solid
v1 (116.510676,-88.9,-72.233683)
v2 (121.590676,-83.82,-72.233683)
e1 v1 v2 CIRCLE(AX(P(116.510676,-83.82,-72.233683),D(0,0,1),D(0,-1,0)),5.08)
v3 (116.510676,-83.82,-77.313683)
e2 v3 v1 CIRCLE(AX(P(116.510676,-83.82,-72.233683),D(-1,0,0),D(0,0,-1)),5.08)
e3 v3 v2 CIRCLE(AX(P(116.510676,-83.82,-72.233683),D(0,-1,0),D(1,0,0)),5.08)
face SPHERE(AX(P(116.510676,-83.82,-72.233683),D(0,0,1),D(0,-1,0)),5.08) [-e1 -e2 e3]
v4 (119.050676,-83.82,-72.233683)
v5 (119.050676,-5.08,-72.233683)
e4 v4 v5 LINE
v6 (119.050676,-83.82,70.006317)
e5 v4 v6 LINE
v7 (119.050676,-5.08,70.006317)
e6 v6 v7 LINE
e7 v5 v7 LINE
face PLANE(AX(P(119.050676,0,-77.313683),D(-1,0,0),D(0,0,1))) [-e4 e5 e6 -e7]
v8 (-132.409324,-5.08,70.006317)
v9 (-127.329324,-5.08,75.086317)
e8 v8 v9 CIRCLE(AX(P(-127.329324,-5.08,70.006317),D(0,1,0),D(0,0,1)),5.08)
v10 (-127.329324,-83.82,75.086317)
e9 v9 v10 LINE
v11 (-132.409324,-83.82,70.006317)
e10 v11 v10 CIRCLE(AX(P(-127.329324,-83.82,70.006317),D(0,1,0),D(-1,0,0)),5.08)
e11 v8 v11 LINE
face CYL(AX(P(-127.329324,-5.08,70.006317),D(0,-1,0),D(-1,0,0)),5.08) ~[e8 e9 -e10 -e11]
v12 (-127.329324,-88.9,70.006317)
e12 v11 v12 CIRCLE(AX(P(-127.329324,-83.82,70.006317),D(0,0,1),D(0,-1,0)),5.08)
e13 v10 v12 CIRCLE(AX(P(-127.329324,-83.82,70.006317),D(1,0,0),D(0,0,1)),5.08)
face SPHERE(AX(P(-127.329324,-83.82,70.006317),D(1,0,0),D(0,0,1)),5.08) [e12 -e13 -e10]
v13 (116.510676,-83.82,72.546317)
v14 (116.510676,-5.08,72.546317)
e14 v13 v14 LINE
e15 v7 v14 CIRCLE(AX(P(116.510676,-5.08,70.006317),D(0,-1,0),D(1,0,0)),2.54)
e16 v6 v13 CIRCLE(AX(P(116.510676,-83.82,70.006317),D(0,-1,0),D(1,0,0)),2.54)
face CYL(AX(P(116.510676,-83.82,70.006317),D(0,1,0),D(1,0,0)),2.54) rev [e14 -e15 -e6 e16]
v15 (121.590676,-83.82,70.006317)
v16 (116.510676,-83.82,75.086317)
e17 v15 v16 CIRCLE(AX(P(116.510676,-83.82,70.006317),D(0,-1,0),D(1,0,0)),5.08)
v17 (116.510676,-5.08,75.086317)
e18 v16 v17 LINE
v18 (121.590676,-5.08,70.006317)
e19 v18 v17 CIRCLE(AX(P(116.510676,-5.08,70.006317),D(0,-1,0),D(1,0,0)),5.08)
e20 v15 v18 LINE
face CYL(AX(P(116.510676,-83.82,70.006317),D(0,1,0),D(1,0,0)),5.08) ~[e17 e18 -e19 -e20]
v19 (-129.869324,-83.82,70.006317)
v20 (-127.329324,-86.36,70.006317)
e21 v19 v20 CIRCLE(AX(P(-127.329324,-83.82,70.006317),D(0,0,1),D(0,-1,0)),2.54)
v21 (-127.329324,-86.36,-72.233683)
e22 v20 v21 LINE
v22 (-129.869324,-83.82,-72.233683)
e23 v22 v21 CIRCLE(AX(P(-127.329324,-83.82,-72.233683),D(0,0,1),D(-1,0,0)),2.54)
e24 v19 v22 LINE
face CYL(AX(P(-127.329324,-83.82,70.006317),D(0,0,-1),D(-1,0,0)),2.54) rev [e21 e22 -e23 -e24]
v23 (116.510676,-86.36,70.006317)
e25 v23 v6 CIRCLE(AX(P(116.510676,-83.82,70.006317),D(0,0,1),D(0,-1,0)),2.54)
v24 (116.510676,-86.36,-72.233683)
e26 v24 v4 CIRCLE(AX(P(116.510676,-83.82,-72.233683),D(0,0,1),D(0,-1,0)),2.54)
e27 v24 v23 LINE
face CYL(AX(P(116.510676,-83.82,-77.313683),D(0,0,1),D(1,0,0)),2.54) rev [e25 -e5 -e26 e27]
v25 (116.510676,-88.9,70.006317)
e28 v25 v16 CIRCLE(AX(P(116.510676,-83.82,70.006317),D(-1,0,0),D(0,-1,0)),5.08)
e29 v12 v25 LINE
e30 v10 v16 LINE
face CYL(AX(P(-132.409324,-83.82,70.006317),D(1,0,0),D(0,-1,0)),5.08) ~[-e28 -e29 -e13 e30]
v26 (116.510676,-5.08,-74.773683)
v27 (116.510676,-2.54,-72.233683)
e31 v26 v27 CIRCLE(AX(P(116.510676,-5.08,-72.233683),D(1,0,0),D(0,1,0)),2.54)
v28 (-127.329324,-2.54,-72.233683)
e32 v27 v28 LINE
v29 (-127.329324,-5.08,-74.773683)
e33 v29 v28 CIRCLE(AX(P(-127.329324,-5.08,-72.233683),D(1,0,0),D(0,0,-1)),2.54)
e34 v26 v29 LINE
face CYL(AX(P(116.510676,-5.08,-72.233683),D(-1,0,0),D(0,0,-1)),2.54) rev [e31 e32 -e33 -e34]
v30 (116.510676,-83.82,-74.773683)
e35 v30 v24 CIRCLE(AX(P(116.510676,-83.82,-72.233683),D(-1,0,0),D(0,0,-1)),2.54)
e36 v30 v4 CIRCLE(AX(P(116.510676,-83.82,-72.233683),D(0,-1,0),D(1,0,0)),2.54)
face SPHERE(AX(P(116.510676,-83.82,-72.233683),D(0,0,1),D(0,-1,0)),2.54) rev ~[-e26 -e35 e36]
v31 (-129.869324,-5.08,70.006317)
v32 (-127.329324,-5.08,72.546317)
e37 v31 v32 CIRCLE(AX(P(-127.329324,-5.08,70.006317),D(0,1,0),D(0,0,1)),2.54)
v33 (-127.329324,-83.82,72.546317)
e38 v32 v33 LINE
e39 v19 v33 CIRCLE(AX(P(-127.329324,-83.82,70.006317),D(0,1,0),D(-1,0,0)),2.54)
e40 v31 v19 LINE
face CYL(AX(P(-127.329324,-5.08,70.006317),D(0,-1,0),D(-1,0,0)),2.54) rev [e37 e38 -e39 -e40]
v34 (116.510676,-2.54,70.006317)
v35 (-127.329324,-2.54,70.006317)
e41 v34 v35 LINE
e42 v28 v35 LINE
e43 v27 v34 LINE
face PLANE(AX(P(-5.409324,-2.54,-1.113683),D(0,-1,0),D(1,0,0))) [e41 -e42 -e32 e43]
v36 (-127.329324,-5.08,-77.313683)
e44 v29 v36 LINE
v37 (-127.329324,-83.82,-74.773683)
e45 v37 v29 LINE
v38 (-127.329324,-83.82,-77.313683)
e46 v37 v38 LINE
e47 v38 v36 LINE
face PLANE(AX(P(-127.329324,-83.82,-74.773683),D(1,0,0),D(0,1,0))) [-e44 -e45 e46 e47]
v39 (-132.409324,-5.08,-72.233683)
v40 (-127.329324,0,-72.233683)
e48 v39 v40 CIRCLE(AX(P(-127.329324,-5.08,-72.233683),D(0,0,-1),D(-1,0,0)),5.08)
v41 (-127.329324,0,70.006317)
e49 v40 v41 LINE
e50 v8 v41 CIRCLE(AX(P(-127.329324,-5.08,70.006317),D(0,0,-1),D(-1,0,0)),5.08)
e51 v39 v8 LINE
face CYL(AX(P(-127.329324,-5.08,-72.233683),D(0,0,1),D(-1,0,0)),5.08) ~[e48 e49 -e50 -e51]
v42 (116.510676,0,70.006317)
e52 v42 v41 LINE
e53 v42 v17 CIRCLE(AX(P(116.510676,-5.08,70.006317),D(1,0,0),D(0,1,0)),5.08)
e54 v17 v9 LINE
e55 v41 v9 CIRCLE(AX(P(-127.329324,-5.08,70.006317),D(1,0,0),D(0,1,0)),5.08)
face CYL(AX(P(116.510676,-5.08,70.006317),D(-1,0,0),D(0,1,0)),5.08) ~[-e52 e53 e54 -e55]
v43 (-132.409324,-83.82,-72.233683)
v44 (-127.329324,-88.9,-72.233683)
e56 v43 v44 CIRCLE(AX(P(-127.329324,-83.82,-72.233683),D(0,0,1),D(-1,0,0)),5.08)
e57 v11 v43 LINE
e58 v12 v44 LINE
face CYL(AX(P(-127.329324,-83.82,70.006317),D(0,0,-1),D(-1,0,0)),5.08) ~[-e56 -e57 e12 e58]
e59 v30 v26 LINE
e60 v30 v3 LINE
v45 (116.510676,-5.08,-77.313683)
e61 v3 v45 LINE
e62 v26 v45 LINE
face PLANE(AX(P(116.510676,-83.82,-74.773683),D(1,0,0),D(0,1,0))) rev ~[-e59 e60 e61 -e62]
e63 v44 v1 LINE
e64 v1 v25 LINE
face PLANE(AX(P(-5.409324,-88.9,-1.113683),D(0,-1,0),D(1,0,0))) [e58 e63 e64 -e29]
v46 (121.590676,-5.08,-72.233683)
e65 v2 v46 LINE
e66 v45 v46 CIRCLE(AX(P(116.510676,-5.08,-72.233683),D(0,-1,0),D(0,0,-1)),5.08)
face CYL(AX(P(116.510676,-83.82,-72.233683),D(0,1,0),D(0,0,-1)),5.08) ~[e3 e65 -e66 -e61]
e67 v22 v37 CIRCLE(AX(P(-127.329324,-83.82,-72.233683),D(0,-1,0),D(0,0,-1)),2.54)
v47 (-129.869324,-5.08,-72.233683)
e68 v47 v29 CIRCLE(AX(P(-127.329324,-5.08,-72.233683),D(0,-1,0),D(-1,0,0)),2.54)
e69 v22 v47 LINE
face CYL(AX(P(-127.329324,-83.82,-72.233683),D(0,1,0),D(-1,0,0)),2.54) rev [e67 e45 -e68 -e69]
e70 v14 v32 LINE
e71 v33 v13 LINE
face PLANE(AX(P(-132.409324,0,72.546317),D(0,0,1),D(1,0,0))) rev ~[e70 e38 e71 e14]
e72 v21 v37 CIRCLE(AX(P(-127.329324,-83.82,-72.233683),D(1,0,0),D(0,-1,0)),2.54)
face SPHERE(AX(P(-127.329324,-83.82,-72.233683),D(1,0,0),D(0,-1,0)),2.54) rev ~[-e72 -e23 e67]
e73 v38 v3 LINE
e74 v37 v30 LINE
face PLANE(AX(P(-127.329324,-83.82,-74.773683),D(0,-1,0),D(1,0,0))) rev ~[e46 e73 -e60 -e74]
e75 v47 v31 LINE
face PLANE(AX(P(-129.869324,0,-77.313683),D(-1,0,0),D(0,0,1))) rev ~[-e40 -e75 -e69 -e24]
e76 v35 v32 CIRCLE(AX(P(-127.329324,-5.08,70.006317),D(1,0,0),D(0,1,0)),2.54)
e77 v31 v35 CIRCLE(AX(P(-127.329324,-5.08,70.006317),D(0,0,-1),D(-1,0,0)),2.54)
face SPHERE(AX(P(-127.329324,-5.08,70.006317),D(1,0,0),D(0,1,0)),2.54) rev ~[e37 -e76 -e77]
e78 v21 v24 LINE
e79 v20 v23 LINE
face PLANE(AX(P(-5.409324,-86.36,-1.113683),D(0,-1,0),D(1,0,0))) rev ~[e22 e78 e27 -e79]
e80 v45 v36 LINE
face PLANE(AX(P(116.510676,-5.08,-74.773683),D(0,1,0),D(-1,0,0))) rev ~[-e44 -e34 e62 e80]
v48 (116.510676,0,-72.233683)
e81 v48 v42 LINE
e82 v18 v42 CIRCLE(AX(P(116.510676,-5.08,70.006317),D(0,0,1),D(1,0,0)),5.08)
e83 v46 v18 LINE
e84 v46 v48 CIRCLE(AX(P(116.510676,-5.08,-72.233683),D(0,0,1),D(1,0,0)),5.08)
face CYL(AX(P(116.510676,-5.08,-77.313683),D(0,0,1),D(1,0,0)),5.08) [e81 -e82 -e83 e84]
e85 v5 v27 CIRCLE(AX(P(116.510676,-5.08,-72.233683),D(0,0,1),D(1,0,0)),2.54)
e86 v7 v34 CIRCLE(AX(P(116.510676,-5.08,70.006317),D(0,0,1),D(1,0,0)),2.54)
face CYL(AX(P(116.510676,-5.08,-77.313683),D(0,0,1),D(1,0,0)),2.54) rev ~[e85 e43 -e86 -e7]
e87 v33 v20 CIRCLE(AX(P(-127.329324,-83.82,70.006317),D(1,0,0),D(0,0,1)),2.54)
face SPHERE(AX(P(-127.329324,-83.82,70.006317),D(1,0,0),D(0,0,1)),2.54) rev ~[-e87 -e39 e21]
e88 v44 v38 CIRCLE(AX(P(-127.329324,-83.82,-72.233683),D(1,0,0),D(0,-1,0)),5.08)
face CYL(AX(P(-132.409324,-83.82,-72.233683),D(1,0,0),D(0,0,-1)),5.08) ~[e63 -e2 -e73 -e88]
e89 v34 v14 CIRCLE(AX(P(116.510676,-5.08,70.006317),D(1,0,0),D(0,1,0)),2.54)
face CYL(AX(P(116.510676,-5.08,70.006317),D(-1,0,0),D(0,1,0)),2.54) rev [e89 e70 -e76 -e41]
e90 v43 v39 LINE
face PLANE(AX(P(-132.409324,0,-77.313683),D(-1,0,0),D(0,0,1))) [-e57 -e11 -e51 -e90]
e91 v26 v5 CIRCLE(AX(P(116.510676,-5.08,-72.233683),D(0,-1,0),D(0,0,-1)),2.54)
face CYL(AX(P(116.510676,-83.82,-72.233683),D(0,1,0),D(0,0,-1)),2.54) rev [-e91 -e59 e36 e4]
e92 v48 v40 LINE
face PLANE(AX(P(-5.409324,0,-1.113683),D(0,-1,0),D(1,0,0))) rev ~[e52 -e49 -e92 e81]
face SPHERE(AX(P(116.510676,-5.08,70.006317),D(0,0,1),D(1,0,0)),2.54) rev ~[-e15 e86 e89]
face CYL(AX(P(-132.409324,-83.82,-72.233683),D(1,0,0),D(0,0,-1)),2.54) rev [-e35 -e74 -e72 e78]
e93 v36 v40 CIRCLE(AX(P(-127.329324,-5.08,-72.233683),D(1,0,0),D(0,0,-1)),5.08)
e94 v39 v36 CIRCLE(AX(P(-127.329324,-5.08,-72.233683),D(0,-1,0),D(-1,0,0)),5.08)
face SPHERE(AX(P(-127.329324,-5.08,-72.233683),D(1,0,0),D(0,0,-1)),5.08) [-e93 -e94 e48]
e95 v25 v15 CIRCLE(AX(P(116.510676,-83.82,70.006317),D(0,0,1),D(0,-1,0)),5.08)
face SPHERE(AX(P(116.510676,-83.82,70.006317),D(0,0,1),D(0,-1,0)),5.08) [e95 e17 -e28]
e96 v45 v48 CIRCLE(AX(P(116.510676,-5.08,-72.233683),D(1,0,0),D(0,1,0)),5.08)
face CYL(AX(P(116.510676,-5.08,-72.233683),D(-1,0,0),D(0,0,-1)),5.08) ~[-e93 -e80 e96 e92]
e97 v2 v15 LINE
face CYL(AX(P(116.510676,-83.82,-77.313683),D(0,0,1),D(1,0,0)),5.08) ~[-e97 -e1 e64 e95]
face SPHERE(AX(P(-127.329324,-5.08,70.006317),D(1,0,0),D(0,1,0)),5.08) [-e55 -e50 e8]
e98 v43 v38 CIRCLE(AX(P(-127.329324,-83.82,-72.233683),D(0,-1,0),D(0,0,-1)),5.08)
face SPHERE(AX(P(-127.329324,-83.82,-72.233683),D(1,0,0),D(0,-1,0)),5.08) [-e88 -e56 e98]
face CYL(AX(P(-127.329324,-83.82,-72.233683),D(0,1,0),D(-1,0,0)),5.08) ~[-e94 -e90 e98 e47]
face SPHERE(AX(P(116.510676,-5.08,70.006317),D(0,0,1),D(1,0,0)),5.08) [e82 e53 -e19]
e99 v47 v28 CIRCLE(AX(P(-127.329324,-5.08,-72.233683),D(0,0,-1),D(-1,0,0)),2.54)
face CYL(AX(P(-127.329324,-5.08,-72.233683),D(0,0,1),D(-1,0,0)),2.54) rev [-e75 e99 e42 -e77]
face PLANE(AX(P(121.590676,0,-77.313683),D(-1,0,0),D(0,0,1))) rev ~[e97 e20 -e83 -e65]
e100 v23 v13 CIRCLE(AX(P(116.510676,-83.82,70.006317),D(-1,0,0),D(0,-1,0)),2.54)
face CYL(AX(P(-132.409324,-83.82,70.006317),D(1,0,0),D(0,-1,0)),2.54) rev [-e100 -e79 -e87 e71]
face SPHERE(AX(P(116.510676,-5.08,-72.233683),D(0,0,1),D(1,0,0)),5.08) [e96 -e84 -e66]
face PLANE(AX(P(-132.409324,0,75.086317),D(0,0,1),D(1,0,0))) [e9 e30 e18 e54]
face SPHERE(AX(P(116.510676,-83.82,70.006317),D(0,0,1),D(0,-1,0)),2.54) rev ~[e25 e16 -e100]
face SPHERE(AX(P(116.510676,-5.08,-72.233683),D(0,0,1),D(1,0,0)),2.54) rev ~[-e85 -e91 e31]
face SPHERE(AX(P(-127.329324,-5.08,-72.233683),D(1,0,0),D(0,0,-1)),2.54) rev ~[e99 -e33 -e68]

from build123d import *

# Parameters (mm, degrees)
F0_W     = 254
F0_H     = 152.4
F1_DEPTH = 88.9
F2_R     = 5.08
F3_R     = 5.08
F4_R     = 5.08
F5_T     = -2.54


# Not quite as in the source:
# - a shell that OpenCascade refuses in one call is made with other operations: the cavity is built on its own and cut out


with BuildPart() as f1:
    # F0 (on Front) → F1 (new body)
    with BuildSketch(Plane.XZ):
        with Locations((-5.4093236282, -1.1136829853)):
            Rectangle(F0_W, F0_H)
    extrude(amount=F1_DEPTH)

    # F2
    f2_edges = [f1.edges().sort_by_distance(p)[0] for p in [
        (121.590676, -88.9, -1.113683),
        (121.590676, 0, -1.113683),
    ]]
    fillet(f2_edges, radius=F2_R)

    # F3
    f3_edges = [f1.edges().sort_by_distance(p)[0] for p in [
        (-7.949324, -88.9, 75.086317),
        (-7.949324, -88.9, -77.313683),
    ]]
    fillet(f3_edges, radius=F3_R)

    # F4
    f4_edges = [f1.edges().sort_by_distance(p)[0] for p in [
        (-132.409324, 0, -1.113683),
        (-132.409324, -88.9, -1.113683),
    ]]
    fillet(f4_edges, radius=F4_R)

    # F5: a shell. OpenCascade refuses it in one call, so the cavity is built on its own and cut out:
    # the body offset inwards by the wall thickness, plus a prism from it out through each open face.
    f5_core = offset(f1.part, amount=F5_T, mode=Mode.PRIVATE)
    f5_exits = [f5_core.faces().sort_by_distance(p)[0] for p in [
        (-5.409324, -44.45, -74.773683),
    ]]
    add(f5_core, mode=Mode.SUBTRACT)
    extrude(f5_exits, amount=-F5_T, mode=Mode.SUBTRACT)


solid = f1.part
